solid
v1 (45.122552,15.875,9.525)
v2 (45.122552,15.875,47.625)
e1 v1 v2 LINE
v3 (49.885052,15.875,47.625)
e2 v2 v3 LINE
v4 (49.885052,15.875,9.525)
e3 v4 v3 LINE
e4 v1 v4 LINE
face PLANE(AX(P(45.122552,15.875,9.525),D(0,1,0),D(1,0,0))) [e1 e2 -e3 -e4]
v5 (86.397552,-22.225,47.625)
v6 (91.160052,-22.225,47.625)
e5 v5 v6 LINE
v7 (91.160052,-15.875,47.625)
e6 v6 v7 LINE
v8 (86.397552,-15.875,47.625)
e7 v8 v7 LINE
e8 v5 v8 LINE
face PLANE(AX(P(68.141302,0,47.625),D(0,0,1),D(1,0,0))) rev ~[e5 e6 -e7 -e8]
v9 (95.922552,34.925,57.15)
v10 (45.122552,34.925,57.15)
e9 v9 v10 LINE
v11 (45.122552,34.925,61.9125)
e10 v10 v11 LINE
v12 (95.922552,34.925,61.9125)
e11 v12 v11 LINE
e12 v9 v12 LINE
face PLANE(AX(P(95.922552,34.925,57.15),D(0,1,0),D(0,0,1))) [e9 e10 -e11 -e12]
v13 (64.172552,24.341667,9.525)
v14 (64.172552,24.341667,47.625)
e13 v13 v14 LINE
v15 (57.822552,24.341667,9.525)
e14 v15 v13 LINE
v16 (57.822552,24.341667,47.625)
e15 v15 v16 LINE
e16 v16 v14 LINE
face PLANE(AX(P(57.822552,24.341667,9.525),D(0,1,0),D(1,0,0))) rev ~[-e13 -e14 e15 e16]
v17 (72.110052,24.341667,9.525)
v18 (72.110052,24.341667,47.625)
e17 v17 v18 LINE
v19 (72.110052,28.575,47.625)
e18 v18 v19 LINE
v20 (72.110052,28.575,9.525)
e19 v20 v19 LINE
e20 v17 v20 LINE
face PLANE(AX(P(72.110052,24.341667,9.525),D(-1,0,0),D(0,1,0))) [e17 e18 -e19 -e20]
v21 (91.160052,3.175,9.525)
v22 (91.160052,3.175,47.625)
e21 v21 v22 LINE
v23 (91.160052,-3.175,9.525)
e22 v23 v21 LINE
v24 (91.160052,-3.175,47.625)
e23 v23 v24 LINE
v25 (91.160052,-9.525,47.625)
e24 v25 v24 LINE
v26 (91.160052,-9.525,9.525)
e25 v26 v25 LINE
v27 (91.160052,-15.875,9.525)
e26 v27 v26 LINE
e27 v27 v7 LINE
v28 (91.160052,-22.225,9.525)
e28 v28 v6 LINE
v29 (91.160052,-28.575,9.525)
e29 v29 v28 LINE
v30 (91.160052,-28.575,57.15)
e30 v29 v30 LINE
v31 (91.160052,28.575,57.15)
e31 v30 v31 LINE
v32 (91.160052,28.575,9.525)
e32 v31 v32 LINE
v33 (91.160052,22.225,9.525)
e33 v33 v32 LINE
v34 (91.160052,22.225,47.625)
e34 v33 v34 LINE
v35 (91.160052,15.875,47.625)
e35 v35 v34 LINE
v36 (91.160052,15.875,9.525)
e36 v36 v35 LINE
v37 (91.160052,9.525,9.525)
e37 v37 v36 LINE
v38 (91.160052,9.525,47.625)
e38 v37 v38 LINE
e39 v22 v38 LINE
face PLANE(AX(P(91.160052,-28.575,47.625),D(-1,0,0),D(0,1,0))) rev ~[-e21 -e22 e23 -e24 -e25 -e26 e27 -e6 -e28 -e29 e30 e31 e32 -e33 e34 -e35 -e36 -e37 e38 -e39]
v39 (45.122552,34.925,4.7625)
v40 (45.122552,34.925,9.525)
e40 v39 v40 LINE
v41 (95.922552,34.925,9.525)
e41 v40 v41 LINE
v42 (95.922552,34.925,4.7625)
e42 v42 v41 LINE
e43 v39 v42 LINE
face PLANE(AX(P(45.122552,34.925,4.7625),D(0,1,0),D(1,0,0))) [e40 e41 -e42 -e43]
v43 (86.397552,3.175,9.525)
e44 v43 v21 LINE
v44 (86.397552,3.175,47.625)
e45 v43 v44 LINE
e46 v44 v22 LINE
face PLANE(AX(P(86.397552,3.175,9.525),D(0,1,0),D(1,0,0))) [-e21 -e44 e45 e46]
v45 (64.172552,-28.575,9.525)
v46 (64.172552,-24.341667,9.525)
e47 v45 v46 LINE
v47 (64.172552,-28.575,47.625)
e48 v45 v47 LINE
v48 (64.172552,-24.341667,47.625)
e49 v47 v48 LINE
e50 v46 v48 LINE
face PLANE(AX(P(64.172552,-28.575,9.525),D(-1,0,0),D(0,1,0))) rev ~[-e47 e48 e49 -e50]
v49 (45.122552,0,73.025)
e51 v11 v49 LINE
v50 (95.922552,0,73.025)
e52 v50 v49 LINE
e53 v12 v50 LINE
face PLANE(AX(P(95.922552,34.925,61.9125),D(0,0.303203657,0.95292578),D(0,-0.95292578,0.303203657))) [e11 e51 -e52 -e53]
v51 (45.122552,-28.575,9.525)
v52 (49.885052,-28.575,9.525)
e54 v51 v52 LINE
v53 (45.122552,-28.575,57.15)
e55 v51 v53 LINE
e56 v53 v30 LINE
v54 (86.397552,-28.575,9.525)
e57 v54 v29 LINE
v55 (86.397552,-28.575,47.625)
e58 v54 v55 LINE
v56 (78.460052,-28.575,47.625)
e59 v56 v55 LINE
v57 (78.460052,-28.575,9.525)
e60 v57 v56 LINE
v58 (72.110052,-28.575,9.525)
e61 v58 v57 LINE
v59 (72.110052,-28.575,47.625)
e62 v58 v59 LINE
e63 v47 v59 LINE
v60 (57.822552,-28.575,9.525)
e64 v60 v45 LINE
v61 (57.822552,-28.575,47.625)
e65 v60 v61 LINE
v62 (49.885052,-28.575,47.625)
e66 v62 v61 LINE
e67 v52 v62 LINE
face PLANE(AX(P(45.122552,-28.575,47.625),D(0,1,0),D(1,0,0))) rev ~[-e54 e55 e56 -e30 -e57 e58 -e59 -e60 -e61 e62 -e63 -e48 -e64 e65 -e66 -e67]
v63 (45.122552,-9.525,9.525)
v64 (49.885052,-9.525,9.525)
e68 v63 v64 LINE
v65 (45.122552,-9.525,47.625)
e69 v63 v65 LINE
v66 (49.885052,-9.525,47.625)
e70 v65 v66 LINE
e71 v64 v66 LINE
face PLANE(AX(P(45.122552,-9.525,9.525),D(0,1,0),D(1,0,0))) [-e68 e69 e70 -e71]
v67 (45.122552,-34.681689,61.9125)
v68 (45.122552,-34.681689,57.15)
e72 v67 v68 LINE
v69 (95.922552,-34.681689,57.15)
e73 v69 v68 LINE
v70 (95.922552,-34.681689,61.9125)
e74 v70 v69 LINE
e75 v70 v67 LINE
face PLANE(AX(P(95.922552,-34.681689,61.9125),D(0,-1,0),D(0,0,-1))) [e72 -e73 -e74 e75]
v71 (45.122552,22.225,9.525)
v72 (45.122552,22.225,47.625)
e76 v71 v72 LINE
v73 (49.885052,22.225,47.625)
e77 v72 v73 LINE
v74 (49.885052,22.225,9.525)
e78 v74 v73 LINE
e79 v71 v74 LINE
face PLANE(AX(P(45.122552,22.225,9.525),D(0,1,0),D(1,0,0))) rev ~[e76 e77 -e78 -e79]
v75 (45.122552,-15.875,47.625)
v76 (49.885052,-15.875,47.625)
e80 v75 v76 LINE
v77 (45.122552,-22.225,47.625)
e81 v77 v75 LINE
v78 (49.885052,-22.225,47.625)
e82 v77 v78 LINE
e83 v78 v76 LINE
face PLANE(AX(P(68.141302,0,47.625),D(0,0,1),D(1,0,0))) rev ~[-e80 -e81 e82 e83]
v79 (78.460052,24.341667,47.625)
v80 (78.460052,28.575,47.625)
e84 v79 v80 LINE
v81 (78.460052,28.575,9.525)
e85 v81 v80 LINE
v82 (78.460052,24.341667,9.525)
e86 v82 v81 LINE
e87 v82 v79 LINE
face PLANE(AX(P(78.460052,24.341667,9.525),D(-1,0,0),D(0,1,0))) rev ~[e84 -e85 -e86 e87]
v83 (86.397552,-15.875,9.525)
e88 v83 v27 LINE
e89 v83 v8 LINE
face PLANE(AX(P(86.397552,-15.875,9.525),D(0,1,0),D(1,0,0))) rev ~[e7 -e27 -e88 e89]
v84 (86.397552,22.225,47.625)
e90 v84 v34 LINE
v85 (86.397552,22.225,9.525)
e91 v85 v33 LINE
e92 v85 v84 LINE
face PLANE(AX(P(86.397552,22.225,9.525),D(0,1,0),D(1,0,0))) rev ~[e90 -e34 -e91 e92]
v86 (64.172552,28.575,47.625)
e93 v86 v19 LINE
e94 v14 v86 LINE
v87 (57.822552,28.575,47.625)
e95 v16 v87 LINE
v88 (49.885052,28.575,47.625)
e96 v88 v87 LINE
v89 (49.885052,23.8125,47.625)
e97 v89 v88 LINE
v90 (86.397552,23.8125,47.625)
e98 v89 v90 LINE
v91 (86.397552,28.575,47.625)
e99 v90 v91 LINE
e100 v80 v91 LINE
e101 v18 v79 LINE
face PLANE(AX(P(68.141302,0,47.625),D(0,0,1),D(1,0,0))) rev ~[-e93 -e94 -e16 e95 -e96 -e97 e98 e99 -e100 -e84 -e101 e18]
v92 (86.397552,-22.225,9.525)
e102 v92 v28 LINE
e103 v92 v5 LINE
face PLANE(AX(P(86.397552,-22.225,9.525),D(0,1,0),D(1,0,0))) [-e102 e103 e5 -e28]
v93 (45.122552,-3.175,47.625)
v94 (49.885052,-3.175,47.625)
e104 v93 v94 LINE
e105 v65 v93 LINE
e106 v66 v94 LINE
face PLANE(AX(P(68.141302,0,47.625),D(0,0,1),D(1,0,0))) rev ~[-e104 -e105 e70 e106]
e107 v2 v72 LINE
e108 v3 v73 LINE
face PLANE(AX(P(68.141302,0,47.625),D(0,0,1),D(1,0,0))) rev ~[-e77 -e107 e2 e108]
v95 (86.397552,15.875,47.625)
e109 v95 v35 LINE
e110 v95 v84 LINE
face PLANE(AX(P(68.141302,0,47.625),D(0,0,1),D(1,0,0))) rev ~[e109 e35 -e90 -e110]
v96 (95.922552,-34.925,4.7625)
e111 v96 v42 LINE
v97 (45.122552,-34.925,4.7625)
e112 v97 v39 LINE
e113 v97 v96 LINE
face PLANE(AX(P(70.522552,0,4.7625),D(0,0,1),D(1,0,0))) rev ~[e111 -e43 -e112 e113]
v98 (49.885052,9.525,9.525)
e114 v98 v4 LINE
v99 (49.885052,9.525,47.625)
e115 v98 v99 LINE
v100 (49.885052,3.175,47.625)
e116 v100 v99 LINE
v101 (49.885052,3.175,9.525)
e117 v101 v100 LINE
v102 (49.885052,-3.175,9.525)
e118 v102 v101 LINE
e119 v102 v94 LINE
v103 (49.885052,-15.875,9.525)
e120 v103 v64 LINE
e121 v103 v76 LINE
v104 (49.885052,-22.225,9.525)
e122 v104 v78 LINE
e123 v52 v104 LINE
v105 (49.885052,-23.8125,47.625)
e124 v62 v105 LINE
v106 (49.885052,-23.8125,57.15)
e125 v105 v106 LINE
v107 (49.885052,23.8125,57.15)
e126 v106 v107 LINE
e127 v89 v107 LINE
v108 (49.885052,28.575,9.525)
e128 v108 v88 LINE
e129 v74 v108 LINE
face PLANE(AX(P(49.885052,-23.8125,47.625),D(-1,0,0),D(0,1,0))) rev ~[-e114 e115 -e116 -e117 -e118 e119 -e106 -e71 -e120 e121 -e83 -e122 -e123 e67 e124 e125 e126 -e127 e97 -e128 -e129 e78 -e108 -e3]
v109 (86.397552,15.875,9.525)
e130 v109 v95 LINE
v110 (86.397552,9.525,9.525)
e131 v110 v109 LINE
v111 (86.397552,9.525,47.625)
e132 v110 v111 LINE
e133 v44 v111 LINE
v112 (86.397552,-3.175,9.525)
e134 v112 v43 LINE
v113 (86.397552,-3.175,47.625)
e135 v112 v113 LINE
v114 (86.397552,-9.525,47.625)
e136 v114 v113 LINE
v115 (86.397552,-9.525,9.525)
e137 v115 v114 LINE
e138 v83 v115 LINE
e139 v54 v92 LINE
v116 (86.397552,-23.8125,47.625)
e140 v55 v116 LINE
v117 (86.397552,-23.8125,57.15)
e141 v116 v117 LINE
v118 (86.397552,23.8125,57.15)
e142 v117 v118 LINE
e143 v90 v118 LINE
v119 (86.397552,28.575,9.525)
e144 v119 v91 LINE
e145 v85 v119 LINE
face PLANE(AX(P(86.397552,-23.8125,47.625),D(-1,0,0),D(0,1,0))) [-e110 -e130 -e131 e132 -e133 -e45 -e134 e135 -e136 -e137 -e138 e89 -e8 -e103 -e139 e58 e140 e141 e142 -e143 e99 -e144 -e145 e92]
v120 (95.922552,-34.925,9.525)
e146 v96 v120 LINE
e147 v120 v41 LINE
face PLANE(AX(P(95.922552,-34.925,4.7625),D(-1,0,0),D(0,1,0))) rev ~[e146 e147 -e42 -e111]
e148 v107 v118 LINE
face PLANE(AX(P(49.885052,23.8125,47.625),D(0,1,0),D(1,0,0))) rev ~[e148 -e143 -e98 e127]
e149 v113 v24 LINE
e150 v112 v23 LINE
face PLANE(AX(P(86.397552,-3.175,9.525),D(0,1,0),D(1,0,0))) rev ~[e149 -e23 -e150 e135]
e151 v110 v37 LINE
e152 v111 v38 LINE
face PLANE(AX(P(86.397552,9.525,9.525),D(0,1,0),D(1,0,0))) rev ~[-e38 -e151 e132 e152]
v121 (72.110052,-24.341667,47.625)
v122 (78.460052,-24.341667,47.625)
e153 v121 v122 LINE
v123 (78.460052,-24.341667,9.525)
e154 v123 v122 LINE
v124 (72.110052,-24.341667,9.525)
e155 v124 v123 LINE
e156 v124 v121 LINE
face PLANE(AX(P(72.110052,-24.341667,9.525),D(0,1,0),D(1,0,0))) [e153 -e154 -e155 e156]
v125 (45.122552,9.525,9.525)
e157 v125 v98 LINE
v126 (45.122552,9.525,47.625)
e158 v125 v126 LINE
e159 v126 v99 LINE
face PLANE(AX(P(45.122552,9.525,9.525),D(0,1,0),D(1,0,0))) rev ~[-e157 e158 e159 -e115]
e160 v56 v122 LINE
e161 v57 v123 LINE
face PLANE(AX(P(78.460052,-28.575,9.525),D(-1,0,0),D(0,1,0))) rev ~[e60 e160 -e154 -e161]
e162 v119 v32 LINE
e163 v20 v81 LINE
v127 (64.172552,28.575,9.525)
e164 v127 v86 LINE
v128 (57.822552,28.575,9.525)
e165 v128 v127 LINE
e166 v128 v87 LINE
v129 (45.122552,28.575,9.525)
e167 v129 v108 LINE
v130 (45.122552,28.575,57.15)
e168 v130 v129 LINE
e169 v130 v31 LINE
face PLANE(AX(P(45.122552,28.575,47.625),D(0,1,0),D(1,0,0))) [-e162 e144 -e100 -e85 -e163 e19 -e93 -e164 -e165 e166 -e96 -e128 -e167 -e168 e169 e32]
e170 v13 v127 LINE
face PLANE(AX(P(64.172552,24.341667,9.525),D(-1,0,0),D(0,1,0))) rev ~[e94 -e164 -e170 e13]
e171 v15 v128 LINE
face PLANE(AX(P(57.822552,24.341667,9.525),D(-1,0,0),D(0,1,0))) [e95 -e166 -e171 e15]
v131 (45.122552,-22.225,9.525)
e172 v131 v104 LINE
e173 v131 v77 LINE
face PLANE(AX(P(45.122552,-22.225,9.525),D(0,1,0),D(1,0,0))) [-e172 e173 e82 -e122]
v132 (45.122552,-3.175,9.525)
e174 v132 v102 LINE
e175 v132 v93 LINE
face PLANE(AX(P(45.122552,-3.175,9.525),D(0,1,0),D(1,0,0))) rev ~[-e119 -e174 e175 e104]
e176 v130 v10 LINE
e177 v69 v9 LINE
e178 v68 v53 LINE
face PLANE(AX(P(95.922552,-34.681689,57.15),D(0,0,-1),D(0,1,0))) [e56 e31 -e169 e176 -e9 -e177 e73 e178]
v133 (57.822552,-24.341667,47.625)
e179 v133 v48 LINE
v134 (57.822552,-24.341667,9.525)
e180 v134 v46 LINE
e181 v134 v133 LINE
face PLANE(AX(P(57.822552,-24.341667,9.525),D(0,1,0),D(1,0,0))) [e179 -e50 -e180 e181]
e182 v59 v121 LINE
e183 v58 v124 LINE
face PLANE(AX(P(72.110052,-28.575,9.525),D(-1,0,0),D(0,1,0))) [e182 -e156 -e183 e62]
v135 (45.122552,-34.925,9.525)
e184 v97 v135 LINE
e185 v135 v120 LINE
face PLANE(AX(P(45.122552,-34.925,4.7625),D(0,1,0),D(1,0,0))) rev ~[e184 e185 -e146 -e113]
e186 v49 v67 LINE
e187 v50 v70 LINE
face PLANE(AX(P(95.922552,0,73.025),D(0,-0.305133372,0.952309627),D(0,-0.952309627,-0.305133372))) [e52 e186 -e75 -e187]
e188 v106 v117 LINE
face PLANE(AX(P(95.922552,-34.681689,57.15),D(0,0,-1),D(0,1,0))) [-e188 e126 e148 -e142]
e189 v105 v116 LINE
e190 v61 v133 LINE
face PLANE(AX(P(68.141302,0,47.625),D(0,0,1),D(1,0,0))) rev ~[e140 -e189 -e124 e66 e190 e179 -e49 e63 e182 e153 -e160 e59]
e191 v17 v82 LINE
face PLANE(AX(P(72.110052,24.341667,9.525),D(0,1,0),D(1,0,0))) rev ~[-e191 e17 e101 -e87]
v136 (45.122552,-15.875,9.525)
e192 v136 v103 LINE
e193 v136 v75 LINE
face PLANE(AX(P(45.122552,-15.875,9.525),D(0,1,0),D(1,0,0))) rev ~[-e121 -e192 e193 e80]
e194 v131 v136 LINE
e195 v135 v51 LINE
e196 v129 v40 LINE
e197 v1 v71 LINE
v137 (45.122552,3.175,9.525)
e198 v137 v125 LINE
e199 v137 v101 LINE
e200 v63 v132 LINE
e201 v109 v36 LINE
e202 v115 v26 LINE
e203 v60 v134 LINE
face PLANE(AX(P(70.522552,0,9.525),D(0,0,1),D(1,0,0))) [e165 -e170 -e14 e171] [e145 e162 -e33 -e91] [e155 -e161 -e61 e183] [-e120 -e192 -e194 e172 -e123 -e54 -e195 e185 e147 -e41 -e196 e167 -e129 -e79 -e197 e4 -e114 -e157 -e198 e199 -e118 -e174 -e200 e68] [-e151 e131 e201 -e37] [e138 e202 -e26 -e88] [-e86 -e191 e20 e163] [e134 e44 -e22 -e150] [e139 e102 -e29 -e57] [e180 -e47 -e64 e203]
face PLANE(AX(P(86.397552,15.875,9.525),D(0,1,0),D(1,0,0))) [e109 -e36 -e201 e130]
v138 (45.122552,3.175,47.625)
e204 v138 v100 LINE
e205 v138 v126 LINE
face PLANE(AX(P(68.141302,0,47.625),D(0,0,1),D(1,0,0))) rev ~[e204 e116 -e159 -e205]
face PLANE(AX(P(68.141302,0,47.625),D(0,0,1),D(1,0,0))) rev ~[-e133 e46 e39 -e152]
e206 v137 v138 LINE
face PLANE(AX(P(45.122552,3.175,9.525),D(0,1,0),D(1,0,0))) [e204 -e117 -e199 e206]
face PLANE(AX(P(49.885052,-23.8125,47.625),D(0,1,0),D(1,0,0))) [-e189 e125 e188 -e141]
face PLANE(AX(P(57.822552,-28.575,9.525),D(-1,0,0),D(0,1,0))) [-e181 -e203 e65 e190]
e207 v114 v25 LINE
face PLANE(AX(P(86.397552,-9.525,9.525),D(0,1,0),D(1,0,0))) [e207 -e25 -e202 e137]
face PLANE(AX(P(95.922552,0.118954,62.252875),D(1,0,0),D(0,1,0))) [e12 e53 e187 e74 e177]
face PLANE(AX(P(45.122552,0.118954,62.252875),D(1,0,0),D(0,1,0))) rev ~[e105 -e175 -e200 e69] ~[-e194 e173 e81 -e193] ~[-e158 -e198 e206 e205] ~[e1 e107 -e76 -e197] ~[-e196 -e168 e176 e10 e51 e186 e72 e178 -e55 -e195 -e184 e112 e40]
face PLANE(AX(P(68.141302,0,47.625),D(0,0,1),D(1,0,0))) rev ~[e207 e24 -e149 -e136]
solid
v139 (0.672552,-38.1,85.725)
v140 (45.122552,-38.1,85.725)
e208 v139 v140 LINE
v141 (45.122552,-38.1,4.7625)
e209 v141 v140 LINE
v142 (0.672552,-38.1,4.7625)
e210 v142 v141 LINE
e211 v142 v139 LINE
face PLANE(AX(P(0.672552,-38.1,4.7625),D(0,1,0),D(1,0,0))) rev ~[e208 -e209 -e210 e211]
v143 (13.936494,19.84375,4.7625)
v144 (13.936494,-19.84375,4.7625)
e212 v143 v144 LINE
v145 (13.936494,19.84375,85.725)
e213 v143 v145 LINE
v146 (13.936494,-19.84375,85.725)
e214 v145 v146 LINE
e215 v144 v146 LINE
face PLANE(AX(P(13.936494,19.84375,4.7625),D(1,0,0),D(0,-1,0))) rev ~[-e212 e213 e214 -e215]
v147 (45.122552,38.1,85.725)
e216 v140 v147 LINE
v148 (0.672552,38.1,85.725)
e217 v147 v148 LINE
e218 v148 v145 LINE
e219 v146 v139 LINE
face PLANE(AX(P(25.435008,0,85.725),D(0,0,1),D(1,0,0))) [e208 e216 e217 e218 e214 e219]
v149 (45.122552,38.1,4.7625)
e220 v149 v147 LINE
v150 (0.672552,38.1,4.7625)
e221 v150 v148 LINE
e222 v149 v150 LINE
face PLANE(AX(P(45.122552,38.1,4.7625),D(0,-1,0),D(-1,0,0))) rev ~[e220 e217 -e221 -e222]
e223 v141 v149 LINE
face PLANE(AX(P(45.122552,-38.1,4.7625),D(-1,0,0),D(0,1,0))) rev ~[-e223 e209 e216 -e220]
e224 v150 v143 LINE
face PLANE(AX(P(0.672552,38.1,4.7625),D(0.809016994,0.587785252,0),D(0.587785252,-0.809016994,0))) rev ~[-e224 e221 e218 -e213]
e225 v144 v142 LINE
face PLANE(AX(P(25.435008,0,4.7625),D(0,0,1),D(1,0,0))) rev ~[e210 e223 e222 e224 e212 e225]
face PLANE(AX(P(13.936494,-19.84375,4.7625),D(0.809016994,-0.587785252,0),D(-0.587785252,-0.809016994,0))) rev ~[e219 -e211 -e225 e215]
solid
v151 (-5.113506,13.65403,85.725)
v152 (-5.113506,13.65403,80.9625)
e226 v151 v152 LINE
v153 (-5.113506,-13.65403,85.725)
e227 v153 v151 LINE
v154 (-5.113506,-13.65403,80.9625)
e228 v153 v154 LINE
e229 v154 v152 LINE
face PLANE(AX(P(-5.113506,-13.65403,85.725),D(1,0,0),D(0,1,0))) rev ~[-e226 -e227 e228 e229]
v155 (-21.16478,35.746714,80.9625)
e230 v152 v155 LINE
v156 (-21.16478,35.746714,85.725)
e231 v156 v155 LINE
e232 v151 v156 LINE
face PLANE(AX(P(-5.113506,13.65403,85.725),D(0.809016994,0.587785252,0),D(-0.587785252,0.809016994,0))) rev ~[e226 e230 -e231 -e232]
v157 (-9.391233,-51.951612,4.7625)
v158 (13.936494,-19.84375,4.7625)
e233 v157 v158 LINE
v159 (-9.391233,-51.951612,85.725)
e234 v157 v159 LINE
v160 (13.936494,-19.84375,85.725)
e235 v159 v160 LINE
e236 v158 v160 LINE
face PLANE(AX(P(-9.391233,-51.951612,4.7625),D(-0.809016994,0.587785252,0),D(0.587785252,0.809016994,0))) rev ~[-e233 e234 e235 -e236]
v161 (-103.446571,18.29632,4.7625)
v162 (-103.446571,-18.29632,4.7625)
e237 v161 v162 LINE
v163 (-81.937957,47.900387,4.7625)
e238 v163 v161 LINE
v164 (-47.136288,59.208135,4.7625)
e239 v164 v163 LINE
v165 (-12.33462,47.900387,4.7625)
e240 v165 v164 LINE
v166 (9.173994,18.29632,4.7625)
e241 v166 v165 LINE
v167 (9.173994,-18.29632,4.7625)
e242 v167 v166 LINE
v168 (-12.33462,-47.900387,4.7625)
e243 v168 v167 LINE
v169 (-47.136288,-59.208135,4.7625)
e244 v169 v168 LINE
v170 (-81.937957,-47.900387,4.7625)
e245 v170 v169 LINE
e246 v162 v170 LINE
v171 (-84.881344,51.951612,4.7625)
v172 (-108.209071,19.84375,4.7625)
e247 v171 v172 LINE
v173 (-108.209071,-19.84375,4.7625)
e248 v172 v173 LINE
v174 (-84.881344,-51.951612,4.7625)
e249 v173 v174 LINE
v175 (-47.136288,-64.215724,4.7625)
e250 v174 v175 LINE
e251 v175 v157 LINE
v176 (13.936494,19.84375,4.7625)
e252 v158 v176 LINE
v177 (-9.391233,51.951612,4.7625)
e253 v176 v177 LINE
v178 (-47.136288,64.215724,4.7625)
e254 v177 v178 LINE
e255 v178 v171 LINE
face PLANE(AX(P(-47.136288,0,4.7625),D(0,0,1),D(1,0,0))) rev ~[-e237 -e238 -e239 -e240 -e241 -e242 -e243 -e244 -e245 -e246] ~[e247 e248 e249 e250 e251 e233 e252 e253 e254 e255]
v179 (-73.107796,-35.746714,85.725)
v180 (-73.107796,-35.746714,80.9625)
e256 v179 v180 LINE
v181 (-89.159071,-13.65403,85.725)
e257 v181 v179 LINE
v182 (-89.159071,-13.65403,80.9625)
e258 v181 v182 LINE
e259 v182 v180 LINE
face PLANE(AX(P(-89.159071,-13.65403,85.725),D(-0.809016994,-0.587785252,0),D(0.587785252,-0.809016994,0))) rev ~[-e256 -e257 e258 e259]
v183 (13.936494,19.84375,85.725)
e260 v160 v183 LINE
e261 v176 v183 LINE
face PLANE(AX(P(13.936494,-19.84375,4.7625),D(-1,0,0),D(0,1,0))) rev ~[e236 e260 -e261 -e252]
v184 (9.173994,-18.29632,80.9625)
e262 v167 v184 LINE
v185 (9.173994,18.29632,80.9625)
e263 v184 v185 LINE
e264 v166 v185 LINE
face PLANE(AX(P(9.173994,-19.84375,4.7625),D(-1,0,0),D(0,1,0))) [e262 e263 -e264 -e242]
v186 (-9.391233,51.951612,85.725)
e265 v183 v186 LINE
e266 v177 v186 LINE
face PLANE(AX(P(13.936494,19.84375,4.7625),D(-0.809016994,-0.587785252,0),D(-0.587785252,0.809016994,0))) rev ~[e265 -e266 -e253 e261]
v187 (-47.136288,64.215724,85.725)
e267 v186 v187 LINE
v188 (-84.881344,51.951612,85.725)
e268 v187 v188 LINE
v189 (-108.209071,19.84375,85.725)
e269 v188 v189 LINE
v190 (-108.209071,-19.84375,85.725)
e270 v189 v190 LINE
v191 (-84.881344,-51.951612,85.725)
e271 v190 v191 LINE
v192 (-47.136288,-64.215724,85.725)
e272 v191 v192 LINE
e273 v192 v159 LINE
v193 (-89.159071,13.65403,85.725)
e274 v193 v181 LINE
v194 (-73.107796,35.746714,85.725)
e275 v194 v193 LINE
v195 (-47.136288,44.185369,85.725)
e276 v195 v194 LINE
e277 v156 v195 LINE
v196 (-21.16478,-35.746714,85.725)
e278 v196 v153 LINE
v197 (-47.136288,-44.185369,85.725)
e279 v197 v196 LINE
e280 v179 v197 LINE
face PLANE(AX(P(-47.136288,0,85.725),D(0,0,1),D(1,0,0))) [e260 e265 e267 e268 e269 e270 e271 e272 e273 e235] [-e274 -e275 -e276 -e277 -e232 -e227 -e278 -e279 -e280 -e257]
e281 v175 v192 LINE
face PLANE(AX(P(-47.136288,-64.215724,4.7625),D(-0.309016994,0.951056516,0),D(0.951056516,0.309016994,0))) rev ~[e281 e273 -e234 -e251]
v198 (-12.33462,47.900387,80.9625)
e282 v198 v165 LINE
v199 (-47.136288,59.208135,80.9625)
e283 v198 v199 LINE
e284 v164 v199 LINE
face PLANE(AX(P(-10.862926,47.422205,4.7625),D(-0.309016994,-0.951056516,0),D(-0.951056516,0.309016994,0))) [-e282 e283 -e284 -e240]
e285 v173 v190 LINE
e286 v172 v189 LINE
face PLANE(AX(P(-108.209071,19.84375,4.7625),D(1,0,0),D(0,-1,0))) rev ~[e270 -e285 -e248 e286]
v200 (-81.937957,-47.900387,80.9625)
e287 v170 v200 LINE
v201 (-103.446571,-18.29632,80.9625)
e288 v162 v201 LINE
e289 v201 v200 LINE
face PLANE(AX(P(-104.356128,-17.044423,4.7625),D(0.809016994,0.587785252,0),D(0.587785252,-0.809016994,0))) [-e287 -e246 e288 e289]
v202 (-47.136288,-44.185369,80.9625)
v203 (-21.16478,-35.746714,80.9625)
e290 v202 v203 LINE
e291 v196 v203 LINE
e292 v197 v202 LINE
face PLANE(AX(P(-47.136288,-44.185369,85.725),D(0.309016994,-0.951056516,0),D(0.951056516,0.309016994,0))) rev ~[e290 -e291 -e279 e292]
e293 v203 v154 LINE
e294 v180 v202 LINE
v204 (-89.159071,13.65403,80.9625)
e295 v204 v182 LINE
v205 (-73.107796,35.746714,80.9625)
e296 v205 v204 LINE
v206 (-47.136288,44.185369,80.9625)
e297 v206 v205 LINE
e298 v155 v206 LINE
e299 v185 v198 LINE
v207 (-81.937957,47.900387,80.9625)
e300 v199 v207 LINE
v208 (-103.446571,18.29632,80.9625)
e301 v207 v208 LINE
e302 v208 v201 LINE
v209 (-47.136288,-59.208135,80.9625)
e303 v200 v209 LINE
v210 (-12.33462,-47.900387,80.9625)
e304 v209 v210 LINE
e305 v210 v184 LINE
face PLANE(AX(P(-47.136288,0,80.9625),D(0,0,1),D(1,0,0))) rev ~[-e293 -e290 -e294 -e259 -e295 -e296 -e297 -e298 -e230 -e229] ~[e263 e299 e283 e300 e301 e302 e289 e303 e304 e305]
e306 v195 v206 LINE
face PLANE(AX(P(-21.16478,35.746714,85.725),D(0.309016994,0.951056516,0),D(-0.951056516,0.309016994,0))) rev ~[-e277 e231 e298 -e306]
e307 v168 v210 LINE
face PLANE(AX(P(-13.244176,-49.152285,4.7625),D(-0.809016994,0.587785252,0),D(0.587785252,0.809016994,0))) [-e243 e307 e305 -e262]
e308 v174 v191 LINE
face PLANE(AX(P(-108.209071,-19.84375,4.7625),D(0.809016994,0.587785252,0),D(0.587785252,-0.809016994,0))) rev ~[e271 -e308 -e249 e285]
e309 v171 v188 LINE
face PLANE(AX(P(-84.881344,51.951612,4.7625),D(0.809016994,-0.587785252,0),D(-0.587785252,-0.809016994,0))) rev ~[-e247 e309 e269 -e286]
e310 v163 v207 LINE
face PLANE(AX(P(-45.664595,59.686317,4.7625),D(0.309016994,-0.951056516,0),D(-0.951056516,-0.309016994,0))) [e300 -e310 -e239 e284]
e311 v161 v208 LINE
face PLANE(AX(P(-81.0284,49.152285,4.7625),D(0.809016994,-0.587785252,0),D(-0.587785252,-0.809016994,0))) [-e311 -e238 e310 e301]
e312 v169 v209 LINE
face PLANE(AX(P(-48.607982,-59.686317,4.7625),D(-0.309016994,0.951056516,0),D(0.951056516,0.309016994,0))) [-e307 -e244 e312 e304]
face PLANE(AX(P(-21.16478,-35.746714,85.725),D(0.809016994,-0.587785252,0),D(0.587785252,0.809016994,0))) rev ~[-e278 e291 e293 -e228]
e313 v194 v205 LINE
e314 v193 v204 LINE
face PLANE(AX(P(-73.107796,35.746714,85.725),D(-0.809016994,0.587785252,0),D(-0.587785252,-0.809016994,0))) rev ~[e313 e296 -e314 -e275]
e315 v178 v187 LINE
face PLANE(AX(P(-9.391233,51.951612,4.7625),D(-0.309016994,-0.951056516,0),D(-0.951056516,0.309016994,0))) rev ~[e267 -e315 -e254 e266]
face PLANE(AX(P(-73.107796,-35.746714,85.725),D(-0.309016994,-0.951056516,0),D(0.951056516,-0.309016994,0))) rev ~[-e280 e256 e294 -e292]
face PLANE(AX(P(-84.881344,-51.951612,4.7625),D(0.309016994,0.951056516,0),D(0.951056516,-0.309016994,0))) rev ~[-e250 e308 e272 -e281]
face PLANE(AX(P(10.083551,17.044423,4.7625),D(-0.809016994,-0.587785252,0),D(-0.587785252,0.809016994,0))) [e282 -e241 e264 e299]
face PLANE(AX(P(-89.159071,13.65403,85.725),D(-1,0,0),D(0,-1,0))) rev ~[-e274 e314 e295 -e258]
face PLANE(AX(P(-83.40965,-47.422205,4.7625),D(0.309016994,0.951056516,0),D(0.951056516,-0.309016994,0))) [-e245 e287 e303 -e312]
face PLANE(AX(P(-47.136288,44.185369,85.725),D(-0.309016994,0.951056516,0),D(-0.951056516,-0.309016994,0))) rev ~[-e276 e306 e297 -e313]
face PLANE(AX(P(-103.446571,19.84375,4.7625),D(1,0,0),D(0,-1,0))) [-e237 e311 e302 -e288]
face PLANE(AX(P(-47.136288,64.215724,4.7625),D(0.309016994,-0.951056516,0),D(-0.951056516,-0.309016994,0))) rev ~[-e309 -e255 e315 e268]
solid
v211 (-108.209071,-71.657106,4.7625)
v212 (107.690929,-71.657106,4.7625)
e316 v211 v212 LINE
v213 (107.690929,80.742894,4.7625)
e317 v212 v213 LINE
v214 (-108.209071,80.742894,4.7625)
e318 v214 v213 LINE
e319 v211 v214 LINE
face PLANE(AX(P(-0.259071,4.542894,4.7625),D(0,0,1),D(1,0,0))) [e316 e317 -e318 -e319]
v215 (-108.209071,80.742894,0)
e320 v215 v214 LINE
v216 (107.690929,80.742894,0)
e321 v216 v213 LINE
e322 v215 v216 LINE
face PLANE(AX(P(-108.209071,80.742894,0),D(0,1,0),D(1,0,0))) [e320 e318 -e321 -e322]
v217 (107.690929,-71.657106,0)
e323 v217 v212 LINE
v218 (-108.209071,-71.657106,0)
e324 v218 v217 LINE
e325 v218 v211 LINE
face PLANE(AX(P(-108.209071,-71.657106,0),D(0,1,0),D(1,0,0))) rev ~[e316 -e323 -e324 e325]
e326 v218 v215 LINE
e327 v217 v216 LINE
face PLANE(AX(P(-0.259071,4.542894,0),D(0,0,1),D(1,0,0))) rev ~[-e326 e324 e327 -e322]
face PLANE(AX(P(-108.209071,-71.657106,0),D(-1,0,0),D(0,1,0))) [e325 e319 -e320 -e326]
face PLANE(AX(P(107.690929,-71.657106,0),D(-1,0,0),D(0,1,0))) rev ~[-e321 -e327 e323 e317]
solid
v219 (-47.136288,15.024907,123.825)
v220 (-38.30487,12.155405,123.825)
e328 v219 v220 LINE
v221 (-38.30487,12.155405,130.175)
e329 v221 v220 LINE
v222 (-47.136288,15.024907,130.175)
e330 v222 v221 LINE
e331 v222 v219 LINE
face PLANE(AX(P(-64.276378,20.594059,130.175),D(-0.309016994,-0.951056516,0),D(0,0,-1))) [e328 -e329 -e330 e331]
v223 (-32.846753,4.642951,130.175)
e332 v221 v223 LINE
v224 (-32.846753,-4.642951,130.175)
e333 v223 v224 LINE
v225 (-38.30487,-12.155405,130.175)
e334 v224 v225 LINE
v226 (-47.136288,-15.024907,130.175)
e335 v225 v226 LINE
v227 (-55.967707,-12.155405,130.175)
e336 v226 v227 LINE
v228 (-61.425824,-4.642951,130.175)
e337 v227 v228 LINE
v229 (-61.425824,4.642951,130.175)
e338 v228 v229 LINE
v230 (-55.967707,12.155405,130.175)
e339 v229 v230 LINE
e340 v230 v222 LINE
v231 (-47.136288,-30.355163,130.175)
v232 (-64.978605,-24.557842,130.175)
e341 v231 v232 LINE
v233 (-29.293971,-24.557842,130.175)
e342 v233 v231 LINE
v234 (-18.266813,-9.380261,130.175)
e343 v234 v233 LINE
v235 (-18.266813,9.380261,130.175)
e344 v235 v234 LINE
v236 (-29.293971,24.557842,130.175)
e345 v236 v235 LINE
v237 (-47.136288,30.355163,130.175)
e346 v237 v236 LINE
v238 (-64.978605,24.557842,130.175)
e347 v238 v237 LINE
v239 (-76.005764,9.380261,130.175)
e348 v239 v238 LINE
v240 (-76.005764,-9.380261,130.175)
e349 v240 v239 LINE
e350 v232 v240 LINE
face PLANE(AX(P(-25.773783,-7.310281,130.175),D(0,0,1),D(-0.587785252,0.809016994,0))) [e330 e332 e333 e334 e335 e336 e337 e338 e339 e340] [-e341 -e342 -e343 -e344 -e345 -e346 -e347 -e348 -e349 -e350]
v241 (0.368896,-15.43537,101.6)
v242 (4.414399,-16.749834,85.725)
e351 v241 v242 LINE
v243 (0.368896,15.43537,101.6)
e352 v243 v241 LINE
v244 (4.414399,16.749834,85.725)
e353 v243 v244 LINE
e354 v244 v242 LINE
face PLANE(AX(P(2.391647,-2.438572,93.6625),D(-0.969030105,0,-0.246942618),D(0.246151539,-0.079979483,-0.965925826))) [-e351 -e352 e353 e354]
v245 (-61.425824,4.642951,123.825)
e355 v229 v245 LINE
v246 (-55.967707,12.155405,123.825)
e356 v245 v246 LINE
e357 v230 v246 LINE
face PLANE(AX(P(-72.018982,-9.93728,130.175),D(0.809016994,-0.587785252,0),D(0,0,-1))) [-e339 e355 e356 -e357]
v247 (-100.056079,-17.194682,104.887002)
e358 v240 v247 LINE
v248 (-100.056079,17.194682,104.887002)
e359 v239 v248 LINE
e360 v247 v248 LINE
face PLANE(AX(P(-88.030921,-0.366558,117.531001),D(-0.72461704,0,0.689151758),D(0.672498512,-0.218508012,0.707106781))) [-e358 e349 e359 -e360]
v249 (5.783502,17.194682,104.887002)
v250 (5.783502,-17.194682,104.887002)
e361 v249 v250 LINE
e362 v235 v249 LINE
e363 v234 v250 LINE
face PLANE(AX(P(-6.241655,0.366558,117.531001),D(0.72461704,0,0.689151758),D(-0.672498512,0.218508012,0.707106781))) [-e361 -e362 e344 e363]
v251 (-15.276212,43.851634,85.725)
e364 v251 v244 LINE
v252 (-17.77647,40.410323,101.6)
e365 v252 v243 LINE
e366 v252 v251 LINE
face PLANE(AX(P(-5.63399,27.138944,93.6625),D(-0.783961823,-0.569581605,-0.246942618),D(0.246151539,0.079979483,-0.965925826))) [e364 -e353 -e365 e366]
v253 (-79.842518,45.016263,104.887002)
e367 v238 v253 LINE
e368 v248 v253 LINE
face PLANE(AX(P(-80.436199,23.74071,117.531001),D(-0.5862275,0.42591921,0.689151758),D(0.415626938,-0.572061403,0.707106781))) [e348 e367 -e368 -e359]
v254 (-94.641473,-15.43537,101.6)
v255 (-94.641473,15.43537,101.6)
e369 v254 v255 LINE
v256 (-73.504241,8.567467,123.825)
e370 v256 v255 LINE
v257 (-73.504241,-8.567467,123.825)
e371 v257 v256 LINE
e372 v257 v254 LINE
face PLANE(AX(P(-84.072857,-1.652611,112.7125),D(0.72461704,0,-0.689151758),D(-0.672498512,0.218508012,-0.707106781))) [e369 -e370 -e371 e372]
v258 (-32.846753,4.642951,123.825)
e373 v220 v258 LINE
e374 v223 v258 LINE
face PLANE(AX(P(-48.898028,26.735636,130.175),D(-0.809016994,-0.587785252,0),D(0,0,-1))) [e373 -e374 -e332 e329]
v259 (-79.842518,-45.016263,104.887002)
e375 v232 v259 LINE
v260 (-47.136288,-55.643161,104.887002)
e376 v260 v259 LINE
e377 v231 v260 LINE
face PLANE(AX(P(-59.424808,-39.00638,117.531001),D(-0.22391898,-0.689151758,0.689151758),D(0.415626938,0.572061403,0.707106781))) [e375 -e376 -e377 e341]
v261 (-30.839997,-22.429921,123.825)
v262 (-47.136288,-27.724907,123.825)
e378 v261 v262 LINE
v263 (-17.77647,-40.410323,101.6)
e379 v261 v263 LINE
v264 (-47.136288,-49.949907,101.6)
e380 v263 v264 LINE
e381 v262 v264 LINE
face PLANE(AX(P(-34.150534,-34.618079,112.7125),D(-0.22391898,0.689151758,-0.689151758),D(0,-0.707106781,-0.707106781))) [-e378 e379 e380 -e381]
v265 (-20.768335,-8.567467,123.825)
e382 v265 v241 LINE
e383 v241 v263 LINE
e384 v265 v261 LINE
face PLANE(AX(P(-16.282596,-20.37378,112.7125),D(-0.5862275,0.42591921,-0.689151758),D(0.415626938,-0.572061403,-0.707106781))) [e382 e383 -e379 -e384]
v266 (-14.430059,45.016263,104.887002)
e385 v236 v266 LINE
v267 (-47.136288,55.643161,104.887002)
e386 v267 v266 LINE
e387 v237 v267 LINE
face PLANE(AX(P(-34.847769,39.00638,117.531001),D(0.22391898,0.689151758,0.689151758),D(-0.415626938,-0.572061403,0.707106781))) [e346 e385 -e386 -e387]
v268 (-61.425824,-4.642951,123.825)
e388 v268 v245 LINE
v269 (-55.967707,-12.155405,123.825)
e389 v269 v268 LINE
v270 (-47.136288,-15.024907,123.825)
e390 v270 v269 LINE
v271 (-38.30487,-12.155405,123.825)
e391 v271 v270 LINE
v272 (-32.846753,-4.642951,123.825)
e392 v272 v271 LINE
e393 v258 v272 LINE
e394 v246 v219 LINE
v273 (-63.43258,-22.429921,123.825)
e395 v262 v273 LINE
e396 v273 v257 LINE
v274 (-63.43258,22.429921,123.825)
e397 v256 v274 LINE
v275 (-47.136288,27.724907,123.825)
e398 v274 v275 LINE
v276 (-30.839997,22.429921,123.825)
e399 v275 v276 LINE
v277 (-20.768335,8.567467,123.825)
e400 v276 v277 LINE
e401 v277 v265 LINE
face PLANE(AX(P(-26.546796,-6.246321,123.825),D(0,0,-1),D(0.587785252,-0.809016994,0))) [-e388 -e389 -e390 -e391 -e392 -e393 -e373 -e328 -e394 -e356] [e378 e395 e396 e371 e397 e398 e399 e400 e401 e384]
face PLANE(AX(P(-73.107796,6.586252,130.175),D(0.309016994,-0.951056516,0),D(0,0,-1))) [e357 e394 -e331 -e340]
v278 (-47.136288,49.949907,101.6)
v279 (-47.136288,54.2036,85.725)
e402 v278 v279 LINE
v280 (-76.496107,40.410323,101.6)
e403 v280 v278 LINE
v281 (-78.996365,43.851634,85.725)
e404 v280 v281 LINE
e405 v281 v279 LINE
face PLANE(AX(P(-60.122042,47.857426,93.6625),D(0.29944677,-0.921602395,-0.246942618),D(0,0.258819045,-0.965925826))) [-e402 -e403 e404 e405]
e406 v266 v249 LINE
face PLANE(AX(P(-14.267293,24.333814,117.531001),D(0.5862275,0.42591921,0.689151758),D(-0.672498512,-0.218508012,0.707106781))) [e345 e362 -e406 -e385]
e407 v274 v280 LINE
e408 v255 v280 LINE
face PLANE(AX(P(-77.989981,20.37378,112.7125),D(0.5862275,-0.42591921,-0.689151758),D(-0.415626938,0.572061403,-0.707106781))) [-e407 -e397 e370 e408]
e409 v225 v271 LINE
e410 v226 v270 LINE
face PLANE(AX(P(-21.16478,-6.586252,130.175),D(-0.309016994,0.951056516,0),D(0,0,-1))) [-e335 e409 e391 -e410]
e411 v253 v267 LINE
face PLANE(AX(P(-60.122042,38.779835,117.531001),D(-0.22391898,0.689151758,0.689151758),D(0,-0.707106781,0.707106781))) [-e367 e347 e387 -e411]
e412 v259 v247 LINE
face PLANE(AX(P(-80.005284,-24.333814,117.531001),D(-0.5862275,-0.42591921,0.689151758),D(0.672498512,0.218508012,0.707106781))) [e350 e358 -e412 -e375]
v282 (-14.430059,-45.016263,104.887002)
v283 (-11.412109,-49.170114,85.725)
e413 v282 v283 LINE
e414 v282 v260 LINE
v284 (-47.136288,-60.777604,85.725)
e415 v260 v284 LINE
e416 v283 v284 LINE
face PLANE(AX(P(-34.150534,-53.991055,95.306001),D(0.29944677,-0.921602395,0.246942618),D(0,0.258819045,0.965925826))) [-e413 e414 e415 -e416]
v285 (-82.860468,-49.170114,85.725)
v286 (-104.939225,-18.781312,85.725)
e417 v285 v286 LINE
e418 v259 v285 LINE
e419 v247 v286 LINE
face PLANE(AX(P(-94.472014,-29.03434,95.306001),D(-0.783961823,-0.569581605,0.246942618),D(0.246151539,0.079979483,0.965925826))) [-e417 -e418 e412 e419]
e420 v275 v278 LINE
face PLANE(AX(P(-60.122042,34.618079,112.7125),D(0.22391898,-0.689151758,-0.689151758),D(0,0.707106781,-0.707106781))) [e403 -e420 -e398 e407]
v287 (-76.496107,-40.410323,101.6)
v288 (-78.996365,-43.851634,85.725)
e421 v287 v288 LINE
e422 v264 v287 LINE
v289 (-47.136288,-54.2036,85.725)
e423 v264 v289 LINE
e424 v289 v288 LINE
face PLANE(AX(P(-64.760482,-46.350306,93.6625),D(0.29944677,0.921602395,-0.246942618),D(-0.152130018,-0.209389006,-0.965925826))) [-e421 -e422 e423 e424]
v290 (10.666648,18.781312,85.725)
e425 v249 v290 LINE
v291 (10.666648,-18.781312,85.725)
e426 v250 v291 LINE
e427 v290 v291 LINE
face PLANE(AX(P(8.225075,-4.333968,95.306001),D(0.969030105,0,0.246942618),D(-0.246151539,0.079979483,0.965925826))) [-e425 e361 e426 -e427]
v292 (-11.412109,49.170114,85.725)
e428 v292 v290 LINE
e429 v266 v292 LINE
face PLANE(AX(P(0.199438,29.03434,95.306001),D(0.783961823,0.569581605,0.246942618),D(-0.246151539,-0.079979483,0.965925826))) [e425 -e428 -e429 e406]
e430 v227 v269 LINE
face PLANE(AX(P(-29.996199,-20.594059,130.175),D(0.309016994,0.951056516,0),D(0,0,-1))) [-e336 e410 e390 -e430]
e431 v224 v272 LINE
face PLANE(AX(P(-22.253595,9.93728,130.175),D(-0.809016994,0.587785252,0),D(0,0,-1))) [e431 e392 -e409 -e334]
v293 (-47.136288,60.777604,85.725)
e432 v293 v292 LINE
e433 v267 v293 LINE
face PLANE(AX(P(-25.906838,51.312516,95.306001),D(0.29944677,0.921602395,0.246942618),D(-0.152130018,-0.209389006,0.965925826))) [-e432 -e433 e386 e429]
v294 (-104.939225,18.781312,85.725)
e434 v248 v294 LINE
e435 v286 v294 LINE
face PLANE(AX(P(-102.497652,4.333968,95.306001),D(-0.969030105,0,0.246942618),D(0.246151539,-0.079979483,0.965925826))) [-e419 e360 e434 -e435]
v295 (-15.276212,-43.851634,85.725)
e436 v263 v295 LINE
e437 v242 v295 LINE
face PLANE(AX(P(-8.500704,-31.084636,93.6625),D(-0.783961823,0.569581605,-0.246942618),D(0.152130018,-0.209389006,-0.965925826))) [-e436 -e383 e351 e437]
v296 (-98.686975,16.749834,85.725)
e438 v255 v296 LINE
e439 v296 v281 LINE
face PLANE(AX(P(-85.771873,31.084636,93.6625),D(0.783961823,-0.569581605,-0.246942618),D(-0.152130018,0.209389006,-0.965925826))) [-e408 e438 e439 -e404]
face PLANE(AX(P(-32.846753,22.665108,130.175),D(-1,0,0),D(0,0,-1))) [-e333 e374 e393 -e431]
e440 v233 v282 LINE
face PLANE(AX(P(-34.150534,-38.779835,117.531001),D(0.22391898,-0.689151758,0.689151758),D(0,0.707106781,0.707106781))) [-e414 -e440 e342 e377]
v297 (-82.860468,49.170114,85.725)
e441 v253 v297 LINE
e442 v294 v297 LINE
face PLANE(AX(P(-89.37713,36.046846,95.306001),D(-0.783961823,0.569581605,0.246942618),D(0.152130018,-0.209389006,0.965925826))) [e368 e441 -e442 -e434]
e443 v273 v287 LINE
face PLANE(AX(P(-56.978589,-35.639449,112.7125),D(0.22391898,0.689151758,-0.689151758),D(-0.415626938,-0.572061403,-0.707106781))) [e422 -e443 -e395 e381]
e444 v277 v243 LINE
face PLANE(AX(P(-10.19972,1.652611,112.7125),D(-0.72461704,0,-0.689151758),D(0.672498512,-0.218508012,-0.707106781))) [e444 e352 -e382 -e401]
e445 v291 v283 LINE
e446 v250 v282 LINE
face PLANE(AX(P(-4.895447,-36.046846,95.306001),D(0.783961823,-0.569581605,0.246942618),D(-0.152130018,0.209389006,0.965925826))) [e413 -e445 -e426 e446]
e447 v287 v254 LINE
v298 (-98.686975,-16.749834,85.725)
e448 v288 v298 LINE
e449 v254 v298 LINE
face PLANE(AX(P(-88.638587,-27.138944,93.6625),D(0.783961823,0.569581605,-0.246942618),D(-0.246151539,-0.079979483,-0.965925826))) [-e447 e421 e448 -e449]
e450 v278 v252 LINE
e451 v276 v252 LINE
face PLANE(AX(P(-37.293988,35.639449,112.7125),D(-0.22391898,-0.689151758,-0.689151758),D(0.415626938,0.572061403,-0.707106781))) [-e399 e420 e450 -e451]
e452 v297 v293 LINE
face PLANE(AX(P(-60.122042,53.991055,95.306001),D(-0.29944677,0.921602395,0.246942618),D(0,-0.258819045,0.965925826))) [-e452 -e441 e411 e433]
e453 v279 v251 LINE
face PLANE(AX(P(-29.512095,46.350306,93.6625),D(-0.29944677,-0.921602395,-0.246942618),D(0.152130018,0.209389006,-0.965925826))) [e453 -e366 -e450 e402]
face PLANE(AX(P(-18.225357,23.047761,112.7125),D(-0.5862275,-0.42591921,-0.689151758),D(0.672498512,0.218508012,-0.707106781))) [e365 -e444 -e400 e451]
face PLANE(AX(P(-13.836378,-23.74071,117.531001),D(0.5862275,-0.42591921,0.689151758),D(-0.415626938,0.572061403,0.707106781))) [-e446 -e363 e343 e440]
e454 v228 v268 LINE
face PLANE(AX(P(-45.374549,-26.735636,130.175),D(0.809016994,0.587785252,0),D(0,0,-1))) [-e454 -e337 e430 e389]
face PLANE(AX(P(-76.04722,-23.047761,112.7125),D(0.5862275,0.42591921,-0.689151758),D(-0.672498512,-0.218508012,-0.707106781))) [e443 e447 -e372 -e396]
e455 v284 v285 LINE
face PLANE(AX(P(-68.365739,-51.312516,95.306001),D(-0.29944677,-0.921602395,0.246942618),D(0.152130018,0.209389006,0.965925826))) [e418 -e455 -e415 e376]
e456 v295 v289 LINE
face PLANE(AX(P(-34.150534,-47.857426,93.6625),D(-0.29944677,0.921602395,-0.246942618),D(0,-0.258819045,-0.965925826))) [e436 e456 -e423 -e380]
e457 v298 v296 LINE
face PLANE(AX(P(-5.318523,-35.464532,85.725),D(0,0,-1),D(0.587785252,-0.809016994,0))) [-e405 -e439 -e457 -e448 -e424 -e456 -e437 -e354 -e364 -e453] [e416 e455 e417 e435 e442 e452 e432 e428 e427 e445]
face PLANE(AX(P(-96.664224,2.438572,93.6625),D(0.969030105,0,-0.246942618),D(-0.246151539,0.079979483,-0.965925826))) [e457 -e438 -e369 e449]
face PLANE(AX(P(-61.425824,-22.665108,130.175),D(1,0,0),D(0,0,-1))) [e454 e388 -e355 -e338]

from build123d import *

# Parameters (mm, degrees)
F0_W      = 215.9
F0_H      = 152.4
F1_DEPTH  = 4.7625
F3_DEPTH  = 80.9625
F4_T      = -4.7625
F6_DEPTH  = 25.4
F7_DEPTH  = 80.9625
F8_W      = 50.8
F8_H      = 69.85
F9_DEPTH  = 4.7625
F10_W     = 4.7625
F10_H     = 6.35
F10_W_2   = 6.35
F10_H_2   = 4.2333333333
F11_DEPTH = 38.1
F12_W     = 46.0375
F12_H     = 57.15
F12_W_2   = 36.5125
F12_H_2   = 47.625
F13_DEPTH = 9.525
F15_DEPTH = 50.8


with BuildPart() as f1:
    # F0 (on Top) → F1 (new body)
    with BuildSketch(Plane.XY):
        with Locations((-0.2590711229, 4.5428941069)):
            Rectangle(F0_W, F0_H)
    extrude(amount=F1_DEPTH)


with BuildPart() as f3:
    # F2 (on face) → F3 (new body)
    with BuildSketch(Plane.XY.offset(4.7625)):
        Polygon((-9.3912329416, 51.9516119643), (-47.136288432, 64.2157239285), (-84.8813439225, 51.9516119643), (-108.2090711229, 19.84375), (-108.2090711229, -19.84375), (-84.8813439225, -51.9516119643), (-47.136288432, -64.2157239285), (-9.3912329416, -51.9516119643), (0.6725522319, -38.1), (13.9364942588, -19.84375), (13.9364942588, 19.84375), (0.6725522319, 38.1), align=None)
    extrude(amount=F3_DEPTH)

    # F4
    f4_openings = [f3.faces().sort_by_distance(p)[0] for p in [
        (-47.136288, 0, 4.7625),
    ]]
    offset(amount=F4_T, openings=f4_openings)

    # F5 (on face) → F6 (cut)
    with BuildSketch(Plane.XY.offset(85.725)):
        Polygon((-73.1077964368, 35.7467140651), (-89.1590711229, 13.6540297868), (-89.1590711229, -13.6540297868), (-73.1077964368, -35.7467140651), (-47.136288432, -44.1853685568), (-21.1647804273, -35.7467140651), (-5.1135057412, -13.6540297868), (-5.1135057412, 13.6540297868), (-21.1647804273, 35.7467140651), (-47.136288432, 44.1853685568), align=None)
    extrude(amount=-F6_DEPTH, mode=Mode.SUBTRACT)


with BuildPart() as f7:
    # F2 (on face) → F7 (new body, through all)
    with BuildSketch(Plane.XY.offset(4.7625)):
        Polygon((45.1225522319, 38.1), (0.6725522319, 38.1), (13.9364942588, 19.84375), (13.9364942588, -19.84375), (0.6725522319, -38.1), (45.1225522319, -38.1), (45.1225522319, 0), align=None)
    extrude(amount=F7_DEPTH)


with BuildPart() as f9:
    # F8 (on face) → F9 (new body)
    with BuildSketch(Plane.XY.offset(4.7625)):
        with Locations((70.5225522319, 0)):
            Rectangle(F8_W, F8_H)
    extrude(amount=F9_DEPTH)

    # F10 (on face) → F11 (join)
    with BuildSketch(Plane.XY.offset(9.525)):
        with Locations((88.7788022319, 25.4)):
            Rectangle(F10_W, F10_H)
        with Locations((88.7788022319, 12.7)):
            Rectangle(F10_W, F10_H)
        with Locations((88.7788022319, 0)):
            Rectangle(F10_W, F10_H)
        with Locations((88.7788022319, -12.7)):
            Rectangle(F10_W, F10_H)
        with Locations((88.7788022319, -25.4)):
            Rectangle(F10_W, F10_H)
        with Locations((75.2850522319, 26.4583333333)):
            Rectangle(F10_W_2, F10_H_2)
        with Locations((47.5038022319, 25.4)):
            Rectangle(F10_W, F10_H)
        with Locations((47.5038022319, 12.7)):
            Rectangle(F10_W, F10_H)
        with Locations((47.5038022319, 0)):
            Rectangle(F10_W, F10_H)
        with Locations((47.5038022319, -12.7)):
            Rectangle(F10_W, F10_H)
        with Locations((47.5038022319, -25.4)):
            Rectangle(F10_W, F10_H)
        with Locations((75.2850522319, -26.4583333333)):
            Rectangle(F10_W_2, F10_H_2)
        with Locations((60.9975522319, -26.4583333333)):
            Rectangle(F10_W_2, F10_H_2)
        with Locations((60.9975522319, 26.4583333333)):
            Rectangle(F10_W_2, F10_H_2)
    extrude(amount=F11_DEPTH)

    # F12 (on face) → F13 (join)
    with BuildSketch(Plane.XY.offset(47.625)):
        with Locations((68.1413022319, 0)):
            Rectangle(F12_W, F12_H)
        with Locations((68.1413022319, 0)):
            Rectangle(F12_W_2, F12_H_2, mode=Mode.SUBTRACT)
    extrude(amount=F13_DEPTH)

    # F14 (on face) → F15 (join)
    with BuildSketch(Plane.YZ.offset(95.9225522319)):
        Polygon((-34.6816889942, 57.15), (-28.3316889942, 57.15), (28.575, 57.15), (34.925, 57.15), (34.925, 61.9125), (0, 73.025), (-34.6816889942, 61.9125), align=None)
    extrude(amount=-F15_DEPTH)


with BuildPart() as f18:
    # F18: sweep along a path in F5
    with BuildLine(Plane.XY.offset(85.725)) as f18_path:
        Line((-5.1135057412, -13.6540297868), (-21.1647804273, -35.7467140651))
        Line((-21.1647804273, -35.7467140651), (-47.136288432, -44.1853685568))
        Line((-47.136288432, -44.1853685568), (-73.1077964368, -35.7467140651))
        Line((-73.1077964368, -35.7467140651), (-89.1590711229, -13.6540297868))
        Line((-89.1590711229, -13.6540297868), (-89.1590711229, 13.6540297868))
        Line((-89.1590711229, 13.6540297868), (-73.1077964368, 35.7467140651))
        Line((-73.1077964368, 35.7467140651), (-47.136288432, 44.1853685568))
        Line((-47.136288432, 44.1853685568), (-21.1647804273, 35.7467140651))
        Line((-21.1647804273, 35.7467140651), (-5.1135057412, 13.6540297868))
        Line((-5.1135057412, 13.6540297868), (-5.1135057412, -13.6540297868))
    # F17 (on mid) → F18 (sweep)
    with BuildSketch(Plane(origin=(-4.5011150194, -13.8530075941, 0), x_dir=(0.9510565163, -0.3090169944, 0), z_dir=(-0.3090169944, -0.9510565163, 0))):
        Polygon((5.1206323029, 101.6), (9.3743257327, 85.725), (15.9483294784, 85.725), (10.8138865512, 104.8870018728), (-14.474111576, 130.175), (-29.8043676971, 130.175), (-29.8043676971, 123.825), (-17.1043676971, 123.825), align=None)
    sweep(path=f18_path.line, transition=Transition.RIGHT)


solid = Compound([f1.part, f3.part, f7.part, f9.part, f18.part])
